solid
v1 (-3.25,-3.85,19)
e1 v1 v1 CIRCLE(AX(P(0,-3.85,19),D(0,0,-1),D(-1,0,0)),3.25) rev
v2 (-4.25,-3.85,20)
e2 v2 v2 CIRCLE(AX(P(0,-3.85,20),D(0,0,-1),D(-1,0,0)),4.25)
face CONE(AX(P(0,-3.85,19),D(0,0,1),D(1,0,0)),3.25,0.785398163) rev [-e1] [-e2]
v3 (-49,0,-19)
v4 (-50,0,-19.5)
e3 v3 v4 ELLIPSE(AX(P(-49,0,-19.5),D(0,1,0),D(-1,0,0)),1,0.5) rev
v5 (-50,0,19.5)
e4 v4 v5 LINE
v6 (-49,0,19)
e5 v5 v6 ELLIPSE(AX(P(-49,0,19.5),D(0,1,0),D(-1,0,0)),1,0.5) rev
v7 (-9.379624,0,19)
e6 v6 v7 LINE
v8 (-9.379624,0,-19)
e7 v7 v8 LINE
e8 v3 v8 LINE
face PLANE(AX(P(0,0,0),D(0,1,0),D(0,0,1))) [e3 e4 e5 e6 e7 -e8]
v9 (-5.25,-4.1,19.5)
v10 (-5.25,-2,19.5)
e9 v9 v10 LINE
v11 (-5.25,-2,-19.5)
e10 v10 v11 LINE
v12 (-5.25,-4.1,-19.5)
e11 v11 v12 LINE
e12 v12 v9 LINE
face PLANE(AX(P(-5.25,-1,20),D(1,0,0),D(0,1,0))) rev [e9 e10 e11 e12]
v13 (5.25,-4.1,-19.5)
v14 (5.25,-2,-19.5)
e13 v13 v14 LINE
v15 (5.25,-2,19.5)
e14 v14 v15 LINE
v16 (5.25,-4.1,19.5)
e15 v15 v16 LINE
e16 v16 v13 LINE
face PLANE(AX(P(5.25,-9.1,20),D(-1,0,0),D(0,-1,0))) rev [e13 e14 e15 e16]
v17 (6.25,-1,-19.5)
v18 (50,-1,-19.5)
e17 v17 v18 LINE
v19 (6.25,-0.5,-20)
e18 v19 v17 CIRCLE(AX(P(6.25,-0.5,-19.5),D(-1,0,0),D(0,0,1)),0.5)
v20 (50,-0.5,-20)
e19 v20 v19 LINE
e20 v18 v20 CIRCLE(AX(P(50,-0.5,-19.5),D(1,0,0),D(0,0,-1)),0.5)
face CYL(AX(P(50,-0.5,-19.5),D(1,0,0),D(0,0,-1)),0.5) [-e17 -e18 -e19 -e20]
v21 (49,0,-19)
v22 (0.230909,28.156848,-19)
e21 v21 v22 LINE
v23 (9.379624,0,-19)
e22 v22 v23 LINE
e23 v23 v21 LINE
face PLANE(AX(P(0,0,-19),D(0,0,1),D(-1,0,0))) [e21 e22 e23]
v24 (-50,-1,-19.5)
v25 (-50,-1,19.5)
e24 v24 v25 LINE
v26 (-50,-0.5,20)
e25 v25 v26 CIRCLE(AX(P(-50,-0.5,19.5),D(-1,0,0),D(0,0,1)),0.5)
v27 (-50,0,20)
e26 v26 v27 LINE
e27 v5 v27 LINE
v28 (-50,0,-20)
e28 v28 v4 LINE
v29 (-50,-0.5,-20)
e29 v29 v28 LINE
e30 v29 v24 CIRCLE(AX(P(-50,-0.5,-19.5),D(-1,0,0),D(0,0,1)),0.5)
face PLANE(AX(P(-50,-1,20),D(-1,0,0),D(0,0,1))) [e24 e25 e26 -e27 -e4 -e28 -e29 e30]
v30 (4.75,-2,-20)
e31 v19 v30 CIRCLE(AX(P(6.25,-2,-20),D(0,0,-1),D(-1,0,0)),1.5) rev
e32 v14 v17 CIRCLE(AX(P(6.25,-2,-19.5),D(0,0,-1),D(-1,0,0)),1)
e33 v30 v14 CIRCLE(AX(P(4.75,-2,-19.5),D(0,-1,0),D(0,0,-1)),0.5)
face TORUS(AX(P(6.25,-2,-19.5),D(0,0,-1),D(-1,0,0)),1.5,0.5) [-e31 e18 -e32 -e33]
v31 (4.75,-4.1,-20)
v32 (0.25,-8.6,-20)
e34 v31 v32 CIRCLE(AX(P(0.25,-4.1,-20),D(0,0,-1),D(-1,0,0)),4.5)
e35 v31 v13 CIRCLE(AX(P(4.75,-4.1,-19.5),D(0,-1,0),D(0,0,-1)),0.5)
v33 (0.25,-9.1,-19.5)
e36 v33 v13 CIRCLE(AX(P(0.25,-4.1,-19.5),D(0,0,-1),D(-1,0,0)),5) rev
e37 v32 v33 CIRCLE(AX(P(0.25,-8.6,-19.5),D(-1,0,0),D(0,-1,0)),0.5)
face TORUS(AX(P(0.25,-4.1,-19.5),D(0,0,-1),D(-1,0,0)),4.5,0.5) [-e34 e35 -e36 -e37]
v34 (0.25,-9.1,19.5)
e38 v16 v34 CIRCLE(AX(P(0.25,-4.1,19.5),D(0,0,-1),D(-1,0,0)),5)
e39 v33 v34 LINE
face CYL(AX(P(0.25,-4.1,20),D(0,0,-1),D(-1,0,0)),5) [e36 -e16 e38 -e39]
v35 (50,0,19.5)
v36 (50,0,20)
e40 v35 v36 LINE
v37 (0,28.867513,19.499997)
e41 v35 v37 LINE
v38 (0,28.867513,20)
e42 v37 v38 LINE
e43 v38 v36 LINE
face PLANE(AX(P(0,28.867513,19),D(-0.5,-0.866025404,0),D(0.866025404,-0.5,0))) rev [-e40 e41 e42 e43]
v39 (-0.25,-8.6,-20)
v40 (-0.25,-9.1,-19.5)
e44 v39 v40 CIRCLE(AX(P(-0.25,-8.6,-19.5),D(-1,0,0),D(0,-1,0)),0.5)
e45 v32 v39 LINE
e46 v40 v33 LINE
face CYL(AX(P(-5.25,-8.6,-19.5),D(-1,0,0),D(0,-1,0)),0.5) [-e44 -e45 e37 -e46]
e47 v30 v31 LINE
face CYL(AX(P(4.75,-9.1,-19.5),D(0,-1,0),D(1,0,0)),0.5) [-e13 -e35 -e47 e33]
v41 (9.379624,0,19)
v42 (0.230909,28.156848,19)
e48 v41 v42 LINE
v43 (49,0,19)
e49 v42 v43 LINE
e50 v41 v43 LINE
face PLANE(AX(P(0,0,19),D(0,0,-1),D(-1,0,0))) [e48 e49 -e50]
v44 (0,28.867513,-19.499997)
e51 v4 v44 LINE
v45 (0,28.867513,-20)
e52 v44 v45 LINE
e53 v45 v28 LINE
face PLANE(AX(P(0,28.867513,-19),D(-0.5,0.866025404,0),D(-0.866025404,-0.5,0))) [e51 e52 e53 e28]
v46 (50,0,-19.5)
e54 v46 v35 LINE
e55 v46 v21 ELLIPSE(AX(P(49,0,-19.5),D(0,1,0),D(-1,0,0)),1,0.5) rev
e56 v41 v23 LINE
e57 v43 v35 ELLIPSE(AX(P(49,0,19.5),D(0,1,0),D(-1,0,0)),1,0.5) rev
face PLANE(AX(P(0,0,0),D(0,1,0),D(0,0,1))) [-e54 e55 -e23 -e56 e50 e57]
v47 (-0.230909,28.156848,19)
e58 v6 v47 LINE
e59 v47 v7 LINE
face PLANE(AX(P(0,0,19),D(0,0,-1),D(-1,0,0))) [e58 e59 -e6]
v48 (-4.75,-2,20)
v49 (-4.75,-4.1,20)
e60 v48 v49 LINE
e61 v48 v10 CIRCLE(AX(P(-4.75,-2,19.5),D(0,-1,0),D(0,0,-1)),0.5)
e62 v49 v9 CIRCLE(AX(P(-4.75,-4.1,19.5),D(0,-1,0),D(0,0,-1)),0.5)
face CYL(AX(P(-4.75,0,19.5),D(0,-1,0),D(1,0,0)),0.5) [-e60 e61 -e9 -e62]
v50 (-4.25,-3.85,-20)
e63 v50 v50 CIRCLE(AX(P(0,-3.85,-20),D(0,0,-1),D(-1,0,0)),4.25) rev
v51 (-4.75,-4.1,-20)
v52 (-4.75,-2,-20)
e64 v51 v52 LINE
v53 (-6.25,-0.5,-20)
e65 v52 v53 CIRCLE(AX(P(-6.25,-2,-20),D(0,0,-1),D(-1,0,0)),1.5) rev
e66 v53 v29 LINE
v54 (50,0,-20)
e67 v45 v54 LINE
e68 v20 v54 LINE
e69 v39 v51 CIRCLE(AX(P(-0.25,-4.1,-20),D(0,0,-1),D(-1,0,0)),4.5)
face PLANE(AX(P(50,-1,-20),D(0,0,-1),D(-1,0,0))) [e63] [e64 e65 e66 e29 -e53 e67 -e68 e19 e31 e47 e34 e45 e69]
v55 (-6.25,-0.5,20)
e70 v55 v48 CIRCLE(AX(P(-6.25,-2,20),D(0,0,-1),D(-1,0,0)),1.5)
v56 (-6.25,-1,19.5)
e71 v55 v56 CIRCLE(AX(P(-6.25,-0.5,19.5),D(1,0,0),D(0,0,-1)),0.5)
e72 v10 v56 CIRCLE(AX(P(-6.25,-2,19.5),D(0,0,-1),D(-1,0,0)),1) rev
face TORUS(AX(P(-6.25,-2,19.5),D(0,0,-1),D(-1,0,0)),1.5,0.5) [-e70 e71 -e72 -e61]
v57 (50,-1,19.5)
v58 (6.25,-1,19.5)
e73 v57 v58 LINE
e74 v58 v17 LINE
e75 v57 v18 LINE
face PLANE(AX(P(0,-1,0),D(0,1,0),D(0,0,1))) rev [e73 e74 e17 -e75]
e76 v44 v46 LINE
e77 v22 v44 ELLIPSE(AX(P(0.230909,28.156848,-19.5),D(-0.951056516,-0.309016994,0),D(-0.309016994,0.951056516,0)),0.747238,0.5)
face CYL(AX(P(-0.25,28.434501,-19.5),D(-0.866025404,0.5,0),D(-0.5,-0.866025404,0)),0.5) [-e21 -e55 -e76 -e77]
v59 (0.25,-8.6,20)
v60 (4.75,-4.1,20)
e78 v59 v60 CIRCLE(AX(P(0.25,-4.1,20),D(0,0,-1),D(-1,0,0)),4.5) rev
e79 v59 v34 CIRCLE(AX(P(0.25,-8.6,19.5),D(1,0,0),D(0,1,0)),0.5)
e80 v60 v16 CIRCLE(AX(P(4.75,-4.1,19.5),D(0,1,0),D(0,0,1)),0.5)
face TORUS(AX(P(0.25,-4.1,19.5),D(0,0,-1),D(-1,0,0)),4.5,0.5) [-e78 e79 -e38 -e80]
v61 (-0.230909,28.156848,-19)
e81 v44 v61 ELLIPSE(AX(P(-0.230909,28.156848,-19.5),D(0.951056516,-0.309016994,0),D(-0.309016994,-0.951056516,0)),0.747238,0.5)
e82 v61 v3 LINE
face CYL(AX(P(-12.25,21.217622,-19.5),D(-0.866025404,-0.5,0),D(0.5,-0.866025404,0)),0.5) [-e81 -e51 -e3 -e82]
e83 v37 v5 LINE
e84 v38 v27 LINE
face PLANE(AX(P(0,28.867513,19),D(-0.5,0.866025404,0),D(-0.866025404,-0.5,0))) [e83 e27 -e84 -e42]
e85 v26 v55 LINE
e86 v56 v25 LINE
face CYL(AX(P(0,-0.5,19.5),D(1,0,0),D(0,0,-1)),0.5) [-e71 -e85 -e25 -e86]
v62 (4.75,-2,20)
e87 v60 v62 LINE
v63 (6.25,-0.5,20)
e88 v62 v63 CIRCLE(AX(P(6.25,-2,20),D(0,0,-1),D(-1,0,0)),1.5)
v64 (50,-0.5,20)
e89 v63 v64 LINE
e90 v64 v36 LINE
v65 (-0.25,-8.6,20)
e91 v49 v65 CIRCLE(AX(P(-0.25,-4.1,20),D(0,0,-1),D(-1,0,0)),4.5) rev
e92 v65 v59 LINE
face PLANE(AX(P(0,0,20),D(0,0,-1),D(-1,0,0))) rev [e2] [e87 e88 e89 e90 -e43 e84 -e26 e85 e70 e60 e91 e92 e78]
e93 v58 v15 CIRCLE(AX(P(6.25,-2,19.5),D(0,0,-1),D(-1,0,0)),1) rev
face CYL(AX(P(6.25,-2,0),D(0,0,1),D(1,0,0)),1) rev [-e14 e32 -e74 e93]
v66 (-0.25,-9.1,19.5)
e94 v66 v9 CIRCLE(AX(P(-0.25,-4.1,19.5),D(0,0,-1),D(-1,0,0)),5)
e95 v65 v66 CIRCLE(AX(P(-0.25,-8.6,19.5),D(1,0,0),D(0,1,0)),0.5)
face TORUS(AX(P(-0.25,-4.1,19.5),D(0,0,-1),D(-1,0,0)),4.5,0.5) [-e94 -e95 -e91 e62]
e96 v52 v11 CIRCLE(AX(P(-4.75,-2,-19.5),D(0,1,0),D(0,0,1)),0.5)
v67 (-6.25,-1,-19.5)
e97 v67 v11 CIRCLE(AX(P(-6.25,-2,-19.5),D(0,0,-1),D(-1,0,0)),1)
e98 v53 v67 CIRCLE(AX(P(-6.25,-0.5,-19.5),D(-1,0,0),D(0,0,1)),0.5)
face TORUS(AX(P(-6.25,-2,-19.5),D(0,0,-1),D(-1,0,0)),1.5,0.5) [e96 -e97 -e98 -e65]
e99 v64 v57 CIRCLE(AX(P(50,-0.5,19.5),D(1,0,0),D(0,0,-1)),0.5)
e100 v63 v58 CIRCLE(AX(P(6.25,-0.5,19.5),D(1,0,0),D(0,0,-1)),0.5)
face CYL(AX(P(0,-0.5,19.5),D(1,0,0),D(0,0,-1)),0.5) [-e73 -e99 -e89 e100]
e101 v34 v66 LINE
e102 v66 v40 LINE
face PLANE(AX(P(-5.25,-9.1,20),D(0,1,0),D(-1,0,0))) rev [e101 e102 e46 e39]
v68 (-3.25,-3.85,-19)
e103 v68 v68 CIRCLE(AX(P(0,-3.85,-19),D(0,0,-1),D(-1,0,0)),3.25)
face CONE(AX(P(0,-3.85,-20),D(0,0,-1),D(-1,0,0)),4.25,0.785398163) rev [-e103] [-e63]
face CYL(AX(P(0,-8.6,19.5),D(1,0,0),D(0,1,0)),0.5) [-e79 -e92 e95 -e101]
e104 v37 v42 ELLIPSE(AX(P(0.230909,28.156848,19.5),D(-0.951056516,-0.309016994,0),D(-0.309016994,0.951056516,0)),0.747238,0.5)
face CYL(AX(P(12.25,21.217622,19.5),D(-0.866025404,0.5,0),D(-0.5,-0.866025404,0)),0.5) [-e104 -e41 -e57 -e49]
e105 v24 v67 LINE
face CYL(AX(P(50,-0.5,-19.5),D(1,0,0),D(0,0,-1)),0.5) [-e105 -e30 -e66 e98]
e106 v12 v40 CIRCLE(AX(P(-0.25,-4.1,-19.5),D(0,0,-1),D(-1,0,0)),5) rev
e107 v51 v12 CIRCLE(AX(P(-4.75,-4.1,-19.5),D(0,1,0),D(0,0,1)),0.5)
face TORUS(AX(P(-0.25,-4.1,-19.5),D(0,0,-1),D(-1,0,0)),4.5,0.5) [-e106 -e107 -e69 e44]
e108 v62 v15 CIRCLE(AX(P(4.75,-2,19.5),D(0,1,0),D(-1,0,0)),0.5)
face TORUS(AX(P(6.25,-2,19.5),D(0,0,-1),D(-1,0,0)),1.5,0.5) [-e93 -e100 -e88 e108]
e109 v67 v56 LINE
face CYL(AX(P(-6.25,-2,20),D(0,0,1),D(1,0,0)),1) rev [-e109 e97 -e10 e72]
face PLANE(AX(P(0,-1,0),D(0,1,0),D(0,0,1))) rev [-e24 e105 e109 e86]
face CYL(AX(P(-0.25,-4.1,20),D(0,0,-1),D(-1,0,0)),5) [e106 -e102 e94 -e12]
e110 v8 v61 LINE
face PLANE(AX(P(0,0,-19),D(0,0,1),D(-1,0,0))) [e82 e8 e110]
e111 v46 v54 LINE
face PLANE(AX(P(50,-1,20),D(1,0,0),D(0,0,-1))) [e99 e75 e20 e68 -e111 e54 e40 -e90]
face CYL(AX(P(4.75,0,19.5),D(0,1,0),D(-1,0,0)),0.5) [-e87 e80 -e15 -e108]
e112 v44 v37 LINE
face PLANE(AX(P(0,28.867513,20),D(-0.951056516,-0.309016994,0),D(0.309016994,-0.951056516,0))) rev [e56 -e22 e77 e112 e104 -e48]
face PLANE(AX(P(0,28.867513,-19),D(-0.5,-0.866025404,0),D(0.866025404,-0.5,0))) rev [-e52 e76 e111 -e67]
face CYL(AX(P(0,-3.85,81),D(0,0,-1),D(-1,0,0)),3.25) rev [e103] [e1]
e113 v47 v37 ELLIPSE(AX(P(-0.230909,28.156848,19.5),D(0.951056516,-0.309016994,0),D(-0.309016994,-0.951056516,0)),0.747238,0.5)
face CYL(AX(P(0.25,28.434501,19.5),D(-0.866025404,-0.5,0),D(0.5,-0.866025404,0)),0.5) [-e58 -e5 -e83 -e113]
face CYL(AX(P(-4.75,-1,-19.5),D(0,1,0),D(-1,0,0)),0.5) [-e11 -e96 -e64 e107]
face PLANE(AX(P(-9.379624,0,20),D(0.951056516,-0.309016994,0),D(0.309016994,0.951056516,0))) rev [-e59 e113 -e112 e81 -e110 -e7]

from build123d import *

# Parameters (mm, degrees)
SALIENTE_EXTRUIR1_DEPTH = 1
CROQUIS3_W              = 100
CROQUIS3_H              = 40
SALIENTE_EXTRUIR2_DEPTH = 1
CROQUIS5_W              = 10.5
CROQUIS5_H              = 8.1
SALIENTE_EXTRUIR3_DEPTH = 20
SALIENTE_EXTRUIR4_DEPTH = 20
CROQUIS7_R              = 3.25
CORTAR_EXTRUIR1_DEPTH   = 100
REDONDEO2_R             = 5
CHAFL_N2_SIZE           = 1
REDONDEO3_R             = 1
REDONDEO4_R             = 0.5
REDONDEO5_R             = 0.5


with BuildPart() as part:
    # Croquis1 → Saliente-Extruir1 (new body)
    with BuildSketch(Plane.XY.offset(20)):
        Polygon((-50, 0), (50, 0), (0, 28.867513459), align=None)
    extrude(amount=-SALIENTE_EXTRUIR1_DEPTH)


with BuildPart() as body_2:
    # Simetría4: mirrored copy
    add(part.part.mirror(Plane.XY))


with BuildPart() as part_1:
    add(part.part)

    add(body_2.part)  # Saliente-Extruir2 merges body 2
    # Croquis3 → Saliente-Extruir2 (add)
    with BuildSketch(Plane(origin=(0, 0, 0), x_dir=(1, 0, 0), z_dir=(0, 1, 0))):
        Rectangle(CROQUIS3_W, CROQUIS3_H)
    extrude(amount=-SALIENTE_EXTRUIR2_DEPTH)

    # Croquis5 → Saliente-Extruir3 (add, symmetric)
    with BuildSketch(Plane.XY):
        with Locations((0, -5.05)):
            Rectangle(CROQUIS5_W, CROQUIS5_H)
    extrude(amount=SALIENTE_EXTRUIR3_DEPTH, both=True)

    # Croquis6 → Saliente-Extruir4 (add, symmetric)
    with BuildSketch(Plane.XY):
        Polygon((0, 28.867513459), (9.379623704, 0), (-9.379623704, 0), align=None)
    extrude(amount=SALIENTE_EXTRUIR4_DEPTH, both=True)

    # Croquis7 → Cortar-Extruir1 (cut, symmetric)
    with BuildSketch(Plane.XY.offset(-19)):
        with Locations(Location((0, -3.85, 0), (0, 0, 180))):
            Circle(CROQUIS7_R)
    extrude(amount=CORTAR_EXTRUIR1_DEPTH, both=True, mode=Mode.SUBTRACT)

    # Redondeo2
    redondeo2_edges = [part_1.edges().sort_by_distance(p)[0] for p in [
        (-5.25, -9.1, 0),
        (5.25, -9.1, 0),
    ]]
    fillet(redondeo2_edges, radius=REDONDEO2_R)

    # Chaflán2
    chafl_n2_edges = [part_1.edges().sort_by_distance(p)[0] for p in [
        (3.25, -3.85, -20),
        (3.25, -3.85, 20),
    ]]
    chamfer(chafl_n2_edges, length=CHAFL_N2_SIZE)

    # Redondeo3
    redondeo3_edges = [part_1.edges().sort_by_distance(p)[0] for p in [
        (5.25, -1, 0),
        (-5.25, -1, 0),
    ]]
    fillet(redondeo3_edges, radius=REDONDEO3_R)

    # Redondeo4
    redondeo4_edges = [part_1.edges().sort_by_distance(p)[0] for p in [
        (-5.542893219, -1.292893219, 20),
        (-28.125, -1, 20),
        (28.125, -1, -20),
        (5.25, -3.05, -20),
        (5.25, -3.05, 20),
        (0, -9.1, -20),
        (-3.785533906, -7.635533906, -20),
        (3.785533906, -7.635533906, -20),
        (0, -9.1, 20),
        (-3.785533906, -7.635533906, 20),
        (3.785533906, -7.635533906, 20),
        (28.125, -1, 20),
        (-5.25, -3.05, -20),
        (-5.25, -3.05, 20),
        (-28.125, -1, -20),
        (5.542893219, -1.292893219, -20),
        (5.542893219, -1.292893219, 20),
        (-5.542893219, -1.292893219, -20),
    ]]
    fillet(redondeo4_edges, radius=REDONDEO4_R)

    # Redondeo5
    # the kernel refuses this fillet: 0.5 mm, written as the material it takes off along each edge
    with BuildSketch(Plane(origin=(1.082531755, 29.492513459, 19), x_dir=(0, 0, 1), z_dir=(-0.8660254037844387, -0.5000000000000001, 0))) as redondeo5_piece_1_section:
        with BuildLine():
            CenterArc((REDONDEO5_R, -REDONDEO5_R), REDONDEO5_R, 90, 90)
            Line((0, -REDONDEO5_R), (0, 0))
            Line((0, 0), (REDONDEO5_R, 0))
        make_face()
    redondeo5_piece_1 = extrude(amount=60.235026919, mode=Mode.PRIVATE)
    redondeo5_piece_1 = split(redondeo5_piece_1, bisect_by=Plane(origin=(0.055315574, 28.697269627, 19.065385241), z_dir=(0.9510565162951544, 0.30901699437494506, 0)), keep=Keep.TOP, mode=Mode.PRIVATE)
    add(redondeo5_piece_1, mode=Mode.SUBTRACT)
    with BuildSketch(Plane(origin=(1.082531755, 29.492513459, 19), x_dir=(0, 0, 1), z_dir=(-0.8660254037844387, -0.5000000000000001, 0))) as redondeo5_piece_2_section:
        with BuildLine():
            CenterArc((REDONDEO5_R, -REDONDEO5_R), REDONDEO5_R, 90, 90)
            Line((0, -REDONDEO5_R), (0, 0))
            Line((0, 0), (REDONDEO5_R, 0))
        make_face()
    redondeo5_piece_2 = extrude(amount=60.235026919, mode=Mode.PRIVATE)
    redondeo5_piece_2 = split(redondeo5_piece_2, bisect_by=Plane(origin=(-24.914439582, 0, 19.11193997), z_dir=(0, 1, 0)), keep=Keep.TOP, mode=Mode.PRIVATE)
    redondeo5_piece_2 = split(redondeo5_piece_2, bisect_by=Plane(origin=(-6.644327312, 8.418376676, 19.11193997), z_dir=(-0.9510565162951545, 0.30901699437494473, 0)), keep=Keep.TOP, mode=Mode.PRIVATE)
    add(redondeo5_piece_2, mode=Mode.SUBTRACT)
    with BuildSketch(Plane(origin=(51.082531755, -0.625, -19), x_dir=(0, 0, -1), z_dir=(-0.8660254037844388, 0.49999999999999983, 0))) as redondeo5_piece_3_section:
        with BuildLine():
            CenterArc((REDONDEO5_R, REDONDEO5_R), REDONDEO5_R, 180, 90)
            Line((0, REDONDEO5_R), (0, 0))
            Line((0, 0), (REDONDEO5_R, 0))
        make_face()
    redondeo5_piece_3 = extrude(amount=60.235026919, mode=Mode.PRIVATE)
    redondeo5_piece_3 = split(redondeo5_piece_3, bisect_by=Plane(origin=(24.914439582, 0, -19.11193997), z_dir=(0, 1, 0)), keep=Keep.TOP, mode=Mode.PRIVATE)
    redondeo5_piece_3 = split(redondeo5_piece_3, bisect_by=Plane(origin=(6.644327312, 8.418376676, -19.11193997), z_dir=(0.9510565162951544, 0.30901699437494506, 0)), keep=Keep.TOP, mode=Mode.PRIVATE)
    add(redondeo5_piece_3, mode=Mode.SUBTRACT)
    with BuildSketch(Plane(origin=(51.082531755, -0.625, -19), x_dir=(0, 0, -1), z_dir=(-0.8660254037844388, 0.49999999999999983, 0))) as redondeo5_piece_4_section:
        with BuildLine():
            CenterArc((REDONDEO5_R, REDONDEO5_R), REDONDEO5_R, 180, 90)
            Line((0, REDONDEO5_R), (0, 0))
            Line((0, 0), (REDONDEO5_R, 0))
        make_face()
    redondeo5_piece_4 = extrude(amount=60.235026919, mode=Mode.PRIVATE)
    redondeo5_piece_4 = split(redondeo5_piece_4, bisect_by=Plane(origin=(-0.055315574, 28.697269627, -19.065385241), z_dir=(-0.9510565162951545, 0.30901699437494473, 0)), keep=Keep.TOP, mode=Mode.PRIVATE)
    add(redondeo5_piece_4, mode=Mode.SUBTRACT)
    with BuildSketch(Plane(origin=(1.082531755, 29.492513459, -19), x_dir=(0, 0, -1), z_dir=(-0.8660254037844387, -0.5000000000000001, 0))) as redondeo5_piece_5_section:
        with BuildLine():
            CenterArc((REDONDEO5_R, REDONDEO5_R), REDONDEO5_R, 180, 90)
            Line((0, REDONDEO5_R), (0, 0))
            Line((0, 0), (REDONDEO5_R, 0))
        make_face()
    redondeo5_piece_5 = extrude(amount=60.235026919, mode=Mode.PRIVATE)
    redondeo5_piece_5 = split(redondeo5_piece_5, bisect_by=Plane(origin=(0.055315574, 28.697269627, -19.065385241), z_dir=(0.9510565162951544, 0.30901699437494506, 0)), keep=Keep.TOP, mode=Mode.PRIVATE)
    add(redondeo5_piece_5, mode=Mode.SUBTRACT)
    with BuildSketch(Plane(origin=(1.082531755, 29.492513459, -19), x_dir=(0, 0, -1), z_dir=(-0.8660254037844387, -0.5000000000000001, 0))) as redondeo5_piece_6_section:
        with BuildLine():
            CenterArc((REDONDEO5_R, REDONDEO5_R), REDONDEO5_R, 180, 90)
            Line((0, REDONDEO5_R), (0, 0))
            Line((0, 0), (REDONDEO5_R, 0))
        make_face()
    redondeo5_piece_6 = extrude(amount=60.235026919, mode=Mode.PRIVATE)
    redondeo5_piece_6 = split(redondeo5_piece_6, bisect_by=Plane(origin=(-24.914439582, 0, -19.11193997), z_dir=(0, 1, 0)), keep=Keep.TOP, mode=Mode.PRIVATE)
    redondeo5_piece_6 = split(redondeo5_piece_6, bisect_by=Plane(origin=(-6.644327312, 8.418376676, -19.11193997), z_dir=(-0.9510565162951545, 0.30901699437494473, 0)), keep=Keep.TOP, mode=Mode.PRIVATE)
    add(redondeo5_piece_6, mode=Mode.SUBTRACT)
    with BuildSketch(Plane(origin=(51.082531755, -0.625, 19), x_dir=(0, 0, 1), z_dir=(-0.8660254037844388, 0.49999999999999983, 0))) as redondeo5_piece_7_section:
        with BuildLine():
            CenterArc((REDONDEO5_R, -REDONDEO5_R), REDONDEO5_R, 90, 90)
            Line((0, -REDONDEO5_R), (0, 0))
            Line((0, 0), (REDONDEO5_R, 0))
        make_face()
    redondeo5_piece_7 = extrude(amount=60.235026919, mode=Mode.PRIVATE)
    redondeo5_piece_7 = split(redondeo5_piece_7, bisect_by=Plane(origin=(24.914439582, 0, 19.11193997), z_dir=(0, 1, 0)), keep=Keep.TOP, mode=Mode.PRIVATE)
    redondeo5_piece_7 = split(redondeo5_piece_7, bisect_by=Plane(origin=(6.644327312, 8.418376676, 19.11193997), z_dir=(0.9510565162951544, 0.30901699437494506, 0)), keep=Keep.TOP, mode=Mode.PRIVATE)
    add(redondeo5_piece_7, mode=Mode.SUBTRACT)
    with BuildSketch(Plane(origin=(51.082531755, -0.625, 19), x_dir=(0, 0, 1), z_dir=(-0.8660254037844388, 0.49999999999999983, 0))) as redondeo5_piece_8_section:
        with BuildLine():
            CenterArc((REDONDEO5_R, -REDONDEO5_R), REDONDEO5_R, 90, 90)
            Line((0, -REDONDEO5_R), (0, 0))
            Line((0, 0), (REDONDEO5_R, 0))
        make_face()
    redondeo5_piece_8 = extrude(amount=60.235026919, mode=Mode.PRIVATE)
    redondeo5_piece_8 = split(redondeo5_piece_8, bisect_by=Plane(origin=(-0.055315574, 28.697269627, 19.065385241), z_dir=(-0.9510565162951545, 0.30901699437494473, 0)), keep=Keep.TOP, mode=Mode.PRIVATE)
    add(redondeo5_piece_8, mode=Mode.SUBTRACT)


solid = part_1.part
